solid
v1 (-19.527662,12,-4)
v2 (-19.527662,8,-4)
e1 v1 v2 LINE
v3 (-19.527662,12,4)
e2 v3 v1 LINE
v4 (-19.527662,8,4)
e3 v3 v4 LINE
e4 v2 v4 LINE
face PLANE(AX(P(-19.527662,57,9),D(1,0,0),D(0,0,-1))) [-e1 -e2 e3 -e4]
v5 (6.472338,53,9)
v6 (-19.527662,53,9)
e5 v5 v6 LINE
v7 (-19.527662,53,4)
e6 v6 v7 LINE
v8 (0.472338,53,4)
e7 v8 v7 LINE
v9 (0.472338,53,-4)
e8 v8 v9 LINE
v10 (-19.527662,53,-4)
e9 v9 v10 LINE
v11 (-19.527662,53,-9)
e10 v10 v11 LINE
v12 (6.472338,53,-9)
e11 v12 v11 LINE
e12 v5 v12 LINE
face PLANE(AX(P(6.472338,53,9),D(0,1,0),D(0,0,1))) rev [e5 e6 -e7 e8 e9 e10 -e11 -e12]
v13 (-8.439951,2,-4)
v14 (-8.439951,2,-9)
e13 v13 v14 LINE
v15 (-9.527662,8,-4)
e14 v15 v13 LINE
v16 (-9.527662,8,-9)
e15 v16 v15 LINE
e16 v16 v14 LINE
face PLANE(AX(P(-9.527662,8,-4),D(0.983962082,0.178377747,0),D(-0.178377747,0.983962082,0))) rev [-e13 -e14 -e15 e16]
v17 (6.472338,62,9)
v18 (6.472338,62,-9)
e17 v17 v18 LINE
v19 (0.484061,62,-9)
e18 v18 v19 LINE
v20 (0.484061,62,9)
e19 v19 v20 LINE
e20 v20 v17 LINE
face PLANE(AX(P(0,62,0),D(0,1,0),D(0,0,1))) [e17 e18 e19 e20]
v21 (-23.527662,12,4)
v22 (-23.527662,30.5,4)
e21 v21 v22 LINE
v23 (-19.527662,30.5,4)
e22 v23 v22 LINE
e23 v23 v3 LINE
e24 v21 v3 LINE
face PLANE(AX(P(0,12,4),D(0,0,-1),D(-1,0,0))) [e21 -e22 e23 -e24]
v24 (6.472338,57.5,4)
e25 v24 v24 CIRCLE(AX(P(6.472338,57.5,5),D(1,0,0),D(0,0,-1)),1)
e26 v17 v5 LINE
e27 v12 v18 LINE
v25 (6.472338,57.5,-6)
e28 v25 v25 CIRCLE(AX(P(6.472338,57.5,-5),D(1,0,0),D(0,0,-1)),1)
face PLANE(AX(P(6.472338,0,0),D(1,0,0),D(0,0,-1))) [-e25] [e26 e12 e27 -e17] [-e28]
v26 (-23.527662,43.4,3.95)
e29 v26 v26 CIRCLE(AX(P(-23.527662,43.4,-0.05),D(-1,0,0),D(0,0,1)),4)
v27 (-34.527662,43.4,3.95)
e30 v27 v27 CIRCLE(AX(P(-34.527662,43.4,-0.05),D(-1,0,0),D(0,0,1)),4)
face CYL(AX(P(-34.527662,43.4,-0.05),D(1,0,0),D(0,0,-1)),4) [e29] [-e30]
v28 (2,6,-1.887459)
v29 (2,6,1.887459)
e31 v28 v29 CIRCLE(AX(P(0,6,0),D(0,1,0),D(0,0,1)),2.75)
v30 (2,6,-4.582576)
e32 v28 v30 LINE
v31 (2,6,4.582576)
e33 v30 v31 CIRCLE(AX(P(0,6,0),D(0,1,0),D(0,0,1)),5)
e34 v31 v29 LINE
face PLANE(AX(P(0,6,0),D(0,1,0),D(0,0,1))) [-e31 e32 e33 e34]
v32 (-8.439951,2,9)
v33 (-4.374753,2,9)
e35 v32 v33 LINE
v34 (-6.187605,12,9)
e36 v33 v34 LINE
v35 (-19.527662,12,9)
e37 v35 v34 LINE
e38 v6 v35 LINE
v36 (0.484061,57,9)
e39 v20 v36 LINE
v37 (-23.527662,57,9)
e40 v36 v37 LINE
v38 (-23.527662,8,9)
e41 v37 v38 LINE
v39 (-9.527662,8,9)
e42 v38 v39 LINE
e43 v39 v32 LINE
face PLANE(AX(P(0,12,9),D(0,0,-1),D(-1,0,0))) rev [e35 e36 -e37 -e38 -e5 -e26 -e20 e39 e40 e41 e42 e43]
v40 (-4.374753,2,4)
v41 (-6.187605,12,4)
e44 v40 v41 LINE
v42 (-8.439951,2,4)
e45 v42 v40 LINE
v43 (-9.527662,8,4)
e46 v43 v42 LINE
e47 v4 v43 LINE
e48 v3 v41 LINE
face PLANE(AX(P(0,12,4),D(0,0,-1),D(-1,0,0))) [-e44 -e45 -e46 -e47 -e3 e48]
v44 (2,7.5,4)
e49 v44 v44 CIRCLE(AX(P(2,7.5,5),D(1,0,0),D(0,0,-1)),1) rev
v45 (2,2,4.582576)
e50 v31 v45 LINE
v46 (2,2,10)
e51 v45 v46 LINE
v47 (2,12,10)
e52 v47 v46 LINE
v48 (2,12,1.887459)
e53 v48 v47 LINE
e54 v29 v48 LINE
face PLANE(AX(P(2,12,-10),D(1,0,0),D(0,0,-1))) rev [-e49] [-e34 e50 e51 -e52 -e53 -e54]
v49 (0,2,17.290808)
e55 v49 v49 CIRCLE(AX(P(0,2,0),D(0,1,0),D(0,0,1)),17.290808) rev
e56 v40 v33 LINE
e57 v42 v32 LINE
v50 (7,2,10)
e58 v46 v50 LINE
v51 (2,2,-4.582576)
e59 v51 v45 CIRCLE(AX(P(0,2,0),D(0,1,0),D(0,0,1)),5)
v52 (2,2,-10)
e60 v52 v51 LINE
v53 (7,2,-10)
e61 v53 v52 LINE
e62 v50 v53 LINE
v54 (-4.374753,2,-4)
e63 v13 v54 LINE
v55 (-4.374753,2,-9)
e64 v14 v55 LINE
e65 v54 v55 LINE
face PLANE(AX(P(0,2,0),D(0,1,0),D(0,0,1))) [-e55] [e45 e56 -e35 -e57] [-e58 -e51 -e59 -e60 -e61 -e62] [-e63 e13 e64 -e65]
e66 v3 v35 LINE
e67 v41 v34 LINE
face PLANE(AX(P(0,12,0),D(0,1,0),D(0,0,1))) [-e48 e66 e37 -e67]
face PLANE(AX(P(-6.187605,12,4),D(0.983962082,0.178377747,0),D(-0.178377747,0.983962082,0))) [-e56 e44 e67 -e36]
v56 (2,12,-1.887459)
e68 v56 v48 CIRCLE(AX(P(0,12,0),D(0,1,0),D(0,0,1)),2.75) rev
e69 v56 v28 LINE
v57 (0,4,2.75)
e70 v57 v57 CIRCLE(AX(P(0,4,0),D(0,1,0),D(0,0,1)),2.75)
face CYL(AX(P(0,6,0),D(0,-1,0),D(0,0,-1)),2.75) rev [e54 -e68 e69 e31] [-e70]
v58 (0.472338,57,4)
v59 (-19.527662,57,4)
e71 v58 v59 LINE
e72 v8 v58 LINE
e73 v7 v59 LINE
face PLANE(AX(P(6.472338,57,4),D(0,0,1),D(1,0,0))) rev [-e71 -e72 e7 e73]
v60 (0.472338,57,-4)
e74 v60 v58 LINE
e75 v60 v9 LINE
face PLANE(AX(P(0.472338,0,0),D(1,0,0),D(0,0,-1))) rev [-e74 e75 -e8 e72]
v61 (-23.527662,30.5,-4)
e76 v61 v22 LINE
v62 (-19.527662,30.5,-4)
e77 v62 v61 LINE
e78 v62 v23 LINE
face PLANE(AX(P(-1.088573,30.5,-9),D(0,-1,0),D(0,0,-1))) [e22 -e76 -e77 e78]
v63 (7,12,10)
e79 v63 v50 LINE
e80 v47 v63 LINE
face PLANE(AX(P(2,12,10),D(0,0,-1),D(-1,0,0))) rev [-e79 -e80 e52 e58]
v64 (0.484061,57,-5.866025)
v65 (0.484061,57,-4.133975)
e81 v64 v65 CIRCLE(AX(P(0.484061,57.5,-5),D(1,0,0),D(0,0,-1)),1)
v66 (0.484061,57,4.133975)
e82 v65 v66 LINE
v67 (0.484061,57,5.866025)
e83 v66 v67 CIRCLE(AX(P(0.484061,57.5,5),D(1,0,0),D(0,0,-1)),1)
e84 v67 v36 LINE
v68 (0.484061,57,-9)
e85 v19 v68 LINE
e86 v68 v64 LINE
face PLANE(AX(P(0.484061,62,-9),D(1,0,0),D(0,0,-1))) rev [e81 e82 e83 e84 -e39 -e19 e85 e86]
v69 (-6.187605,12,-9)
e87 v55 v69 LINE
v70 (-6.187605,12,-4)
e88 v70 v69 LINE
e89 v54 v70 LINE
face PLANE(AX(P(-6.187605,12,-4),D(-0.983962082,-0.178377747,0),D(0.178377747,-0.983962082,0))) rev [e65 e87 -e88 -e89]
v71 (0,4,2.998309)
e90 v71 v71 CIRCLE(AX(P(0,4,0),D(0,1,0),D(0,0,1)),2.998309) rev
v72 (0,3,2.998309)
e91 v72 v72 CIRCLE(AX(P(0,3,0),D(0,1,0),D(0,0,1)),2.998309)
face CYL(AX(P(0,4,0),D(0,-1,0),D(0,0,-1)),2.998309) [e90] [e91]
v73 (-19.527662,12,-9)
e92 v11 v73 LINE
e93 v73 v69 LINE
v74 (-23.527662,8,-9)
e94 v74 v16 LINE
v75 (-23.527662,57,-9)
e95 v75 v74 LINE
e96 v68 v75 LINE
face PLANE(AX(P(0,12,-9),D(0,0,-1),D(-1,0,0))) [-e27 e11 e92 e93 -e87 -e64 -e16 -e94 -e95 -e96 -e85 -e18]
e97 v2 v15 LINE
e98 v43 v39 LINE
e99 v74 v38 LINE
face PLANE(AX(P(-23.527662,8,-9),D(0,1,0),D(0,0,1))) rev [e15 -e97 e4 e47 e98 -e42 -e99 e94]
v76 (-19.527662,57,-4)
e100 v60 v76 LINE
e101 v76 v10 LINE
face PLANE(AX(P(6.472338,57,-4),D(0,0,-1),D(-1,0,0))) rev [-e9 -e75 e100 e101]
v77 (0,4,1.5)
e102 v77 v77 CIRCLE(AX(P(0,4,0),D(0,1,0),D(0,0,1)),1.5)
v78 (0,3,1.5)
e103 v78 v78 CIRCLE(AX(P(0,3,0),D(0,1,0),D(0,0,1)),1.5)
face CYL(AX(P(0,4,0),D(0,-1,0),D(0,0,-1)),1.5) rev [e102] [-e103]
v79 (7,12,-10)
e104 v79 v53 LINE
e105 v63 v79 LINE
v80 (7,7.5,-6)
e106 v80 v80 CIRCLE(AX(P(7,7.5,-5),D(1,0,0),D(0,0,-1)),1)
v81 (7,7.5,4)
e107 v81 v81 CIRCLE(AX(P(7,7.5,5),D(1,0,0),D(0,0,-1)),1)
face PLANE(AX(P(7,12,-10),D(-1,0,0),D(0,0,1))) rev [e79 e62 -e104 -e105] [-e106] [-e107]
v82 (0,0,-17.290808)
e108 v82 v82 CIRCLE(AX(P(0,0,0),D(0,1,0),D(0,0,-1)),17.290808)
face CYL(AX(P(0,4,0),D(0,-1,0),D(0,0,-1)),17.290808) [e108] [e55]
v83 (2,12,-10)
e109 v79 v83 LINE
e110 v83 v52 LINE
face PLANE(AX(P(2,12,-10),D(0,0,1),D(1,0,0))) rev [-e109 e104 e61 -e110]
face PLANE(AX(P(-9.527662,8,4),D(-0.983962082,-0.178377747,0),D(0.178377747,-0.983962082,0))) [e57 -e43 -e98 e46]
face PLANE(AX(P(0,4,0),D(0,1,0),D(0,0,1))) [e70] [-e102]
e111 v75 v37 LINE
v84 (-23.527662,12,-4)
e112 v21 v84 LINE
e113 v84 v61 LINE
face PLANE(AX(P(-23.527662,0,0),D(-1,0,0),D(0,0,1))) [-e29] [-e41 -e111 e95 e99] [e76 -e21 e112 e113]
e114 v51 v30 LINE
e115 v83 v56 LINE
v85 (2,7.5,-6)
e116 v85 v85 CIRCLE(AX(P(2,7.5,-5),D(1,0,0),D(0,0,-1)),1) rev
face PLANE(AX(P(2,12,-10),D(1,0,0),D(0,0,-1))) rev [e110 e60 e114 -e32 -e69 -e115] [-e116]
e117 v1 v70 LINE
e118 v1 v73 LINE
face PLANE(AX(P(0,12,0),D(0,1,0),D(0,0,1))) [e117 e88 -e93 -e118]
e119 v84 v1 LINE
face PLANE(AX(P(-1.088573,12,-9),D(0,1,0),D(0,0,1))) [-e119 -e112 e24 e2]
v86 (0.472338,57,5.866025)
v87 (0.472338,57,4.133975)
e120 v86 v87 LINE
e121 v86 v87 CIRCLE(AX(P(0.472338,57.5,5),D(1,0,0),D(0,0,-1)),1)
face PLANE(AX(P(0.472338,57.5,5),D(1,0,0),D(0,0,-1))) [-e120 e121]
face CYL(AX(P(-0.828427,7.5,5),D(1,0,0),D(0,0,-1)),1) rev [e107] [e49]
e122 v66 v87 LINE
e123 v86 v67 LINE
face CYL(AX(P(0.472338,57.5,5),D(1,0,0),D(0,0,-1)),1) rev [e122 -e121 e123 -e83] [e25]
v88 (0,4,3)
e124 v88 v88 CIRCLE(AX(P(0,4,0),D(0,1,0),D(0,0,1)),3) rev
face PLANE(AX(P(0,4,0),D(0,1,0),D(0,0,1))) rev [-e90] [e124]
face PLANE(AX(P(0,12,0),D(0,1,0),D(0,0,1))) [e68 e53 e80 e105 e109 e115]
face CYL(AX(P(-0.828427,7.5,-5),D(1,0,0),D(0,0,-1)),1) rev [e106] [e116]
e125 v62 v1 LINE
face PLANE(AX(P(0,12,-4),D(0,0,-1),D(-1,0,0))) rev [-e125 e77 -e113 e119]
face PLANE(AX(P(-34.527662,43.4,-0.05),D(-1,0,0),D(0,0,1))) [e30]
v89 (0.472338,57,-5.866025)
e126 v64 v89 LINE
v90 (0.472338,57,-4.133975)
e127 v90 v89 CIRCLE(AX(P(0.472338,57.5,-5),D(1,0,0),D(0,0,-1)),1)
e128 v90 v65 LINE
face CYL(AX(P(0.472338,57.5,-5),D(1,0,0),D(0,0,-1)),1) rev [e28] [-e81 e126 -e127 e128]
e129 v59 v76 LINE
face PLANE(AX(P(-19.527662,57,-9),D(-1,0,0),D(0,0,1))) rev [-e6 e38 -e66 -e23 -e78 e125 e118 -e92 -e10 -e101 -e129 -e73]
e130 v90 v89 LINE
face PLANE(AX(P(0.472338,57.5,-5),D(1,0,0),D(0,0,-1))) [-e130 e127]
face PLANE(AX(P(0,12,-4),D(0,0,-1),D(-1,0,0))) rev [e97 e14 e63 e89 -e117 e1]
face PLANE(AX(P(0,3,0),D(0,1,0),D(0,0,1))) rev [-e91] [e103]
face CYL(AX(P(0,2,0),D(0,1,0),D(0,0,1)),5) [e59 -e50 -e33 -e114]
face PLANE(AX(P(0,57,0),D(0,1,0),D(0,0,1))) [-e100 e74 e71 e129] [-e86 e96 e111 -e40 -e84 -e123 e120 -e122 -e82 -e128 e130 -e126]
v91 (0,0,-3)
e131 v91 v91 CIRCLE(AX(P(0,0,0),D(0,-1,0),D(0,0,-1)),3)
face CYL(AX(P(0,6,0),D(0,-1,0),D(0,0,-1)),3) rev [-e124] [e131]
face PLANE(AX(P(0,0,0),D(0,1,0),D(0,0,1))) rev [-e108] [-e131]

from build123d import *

# Parameters (mm, degrees)
SKETCH1_W                  = 40
SKETCH1_H                  = 25
BOSS_EXTRUDE1_DEPTH        = 2
SKETCH2_W                  = 5
SKETCH2_H                  = 20
BOSS_EXTRUDE2_DEPTH        = 10
SKETCH4_W                  = 19.965035534
SKETCH4_H                  = 6
BOSS_EXTRUDE3_DEPTH        = 5
SKETCH5_R                  = 1
CUT_EXTRUDE2_DEPTH         = 5
SKETCH6_W                  = 4
SKETCH6_H                  = 5
BOSS_EXTRUDE4_DEPTH        = 10
SKETCH8_W                  = 5
SKETCH8_H                  = 4
BOSS_EXTRUDE5_DEPTH        = 10
SKETCH9_W                  = 4
SKETCH9_H                  = 5
BOSS_EXTRUDE6_DEPTH        = 45
SKETCH12_W                 = 18
SKETCH12_H                 = 4
BOSS_EXTRUDE8_DEPTH        = 4
SKETCH13_W                 = 5
SKETCH13_H                 = 4
BOSS_EXTRUDE9_DEPTH        = 26
SKETCH14_W                 = 18
SKETCH14_H                 = 4
BOSS_EXTRUDE10_DEPTH       = 6
SKETCH16_W                 = 5.988277512
SKETCH16_H                 = 18
BOSS_EXTRUDE11_DEPTH       = 5
SKETCH15_R                 = 1
CUT_EXTRUDE3_DEPTH         = 6
SKETCH17_R                 = 3
CUT_EXTRUDE5_DEPTH         = 6
SKETCH24_W                 = 8
SKETCH24_H                 = 18.5
BOSS_EXTRUDE18_DEPTH       = 4
BOSS_EXTRUDE20_START       = -1
SKETCH20_R                 = 5
SKETCH20_R_2               = 3
BOSS_EXTRUDE20_DEPTH       = 1
BOSS_EXTRUDE21_OUTLINE_R   = 2.998308623
BOSS_EXTRUDE21_OUTLINE_R_2 = 1.5
BOSS_EXTRUDE21_DEPTH       = 1
SKETCH27_R                 = 5
SKETCH27_R_2               = 2.75
BOSS_EXTRUDE22_DEPTH       = 2
SKETCH28_R                 = 2.75
CUT_EXTRUDE10_DEPTH        = 10
SKETCH31_R                 = 4
BOSS_EXTRUDE23_DEPTH       = 11
SKETCH32_R                 = 23.58495283
BOSS_EXTRUDE24_DEPTH       = 2
SKETCH33_R                 = 3
CUT_EXTRUDE11_DEPTH        = 3
CUT_EXTRUDE12_DEPTH        = 10
CUT_EXTRUDE13_DEPTH        = 4
BOSS_EXTRUDE25_DEPTH       = 2
CUT_EXTRUDE15_DEPTH        = 2
SKETCH38_W                 = 4
SKETCH38_H                 = 6
CUT_EXTRUDE16_DEPTH        = 76.679363321
BOSS_EXTRUDE26_DEPTH       = 5


# Read off the part's stored shape, not the designer's step: Boss-Extrude21
with BuildPart() as part:
    # Sketch1 → Boss-Extrude1 (new body)
    with BuildSketch(Plane(origin=(0, 0, 0), x_dir=(1, 0, 0), z_dir=(0, 1, 0))):
        Rectangle(SKETCH1_W, SKETCH1_H)
    extrude(amount=BOSS_EXTRUDE1_DEPTH)

    # Sketch2 → Boss-Extrude2 (add)
    with BuildSketch(Plane(origin=(0, 2, 0), x_dir=(1, 0, 0), z_dir=(0, 1, 0))):
        with Locations((4.5, 0)):
            Rectangle(SKETCH2_W, SKETCH2_H)
    extrude(amount=BOSS_EXTRUDE2_DEPTH)

    # Sketch4 → Boss-Extrude3 (add)
    with BuildSketch(Plane(origin=(7, 0, 0), x_dir=(0, 0, -1), z_dir=(1, 0, 0))):
        with Locations((-0.017482233, 9)):
            Rectangle(SKETCH4_W, SKETCH4_H)
    extrude(amount=-BOSS_EXTRUDE3_DEPTH)

    # Sketch5 → Cut-Extrude2 (cut)
    with BuildSketch(Plane(origin=(7, 0, 0), x_dir=(0, 0, -1), z_dir=(1, 0, 0))):
        with Locations((5, 7.5)):
            Circle(SKETCH5_R)
        with Locations((-5, 7.5)):
            Circle(SKETCH5_R)
    extrude(amount=-CUT_EXTRUDE2_DEPTH, mode=Mode.SUBTRACT)

    # Sketch6 → Boss-Extrude4 (add)
    with BuildSketch(Plane(origin=(0, 2, 0), x_dir=(1, 0, 0), z_dir=(0, 1, 0))):
        with Locations((-11.527661753, -6.5)):
            Rectangle(SKETCH6_W, SKETCH6_H)
        with Locations((-11.527661753, 6.5)):
            Rectangle(SKETCH6_W, SKETCH6_H)
    extrude(amount=BOSS_EXTRUDE4_DEPTH)

    # Sketch8 → Boss-Extrude5 (add)
    with BuildSketch(Plane.ZY.offset(13.527661753)):
        with Locations((-6.5, 10)):
            Rectangle(SKETCH8_W, SKETCH8_H)
    boss_extrude5 = extrude(amount=BOSS_EXTRUDE5_DEPTH)

    # Mirror1: Boss-Extrude5 across plane
    add(boss_extrude5.mirror(Plane(origin=(0, 0, 0), x_dir=(1, 0, 0), z_dir=(0, 0, -1))))

    # Sketch9 → Boss-Extrude6 (add)
    with BuildSketch(Plane(origin=(0, 12, 0), x_dir=(1, 0, 0), z_dir=(0, 1, 0))):
        with Locations((-21.527661753, 6.5)):
            Rectangle(SKETCH9_W, SKETCH9_H)
    boss_extrude6 = extrude(amount=BOSS_EXTRUDE6_DEPTH)

    # Mirror2: Boss-Extrude5 across plane
    add(boss_extrude5.mirror(Plane(origin=(0, 0, 0), x_dir=(1, 0, 0), z_dir=(0, 0, -1))))

    # Mirror3: Boss-Extrude6 across plane
    add(boss_extrude6.mirror(Plane(origin=(0, 0, 0), x_dir=(1, 0, 0), z_dir=(0, 0, -1))))

    # Sketch12 → Boss-Extrude8 (add)
    with BuildSketch(Plane.ZY.offset(23.527661753)):
        with Locations((0, 55)):
            Rectangle(SKETCH12_W, SKETCH12_H)
        with Locations((0, 10)):
            Rectangle(SKETCH12_W, SKETCH12_H)
        with Locations((0, 32.5)):
            Rectangle(SKETCH12_W, SKETCH12_H)
    extrude(amount=-BOSS_EXTRUDE8_DEPTH)

    # Sketch13 → Boss-Extrude9 (add)
    with BuildSketch(Plane(origin=(-19.527661753, 0, 0), x_dir=(0, 0, -1), z_dir=(1, 0, 0))):
        with Locations((-6.5, 55)):
            Rectangle(SKETCH13_W, SKETCH13_H)
        with Locations((6.5, 55)):
            Rectangle(SKETCH13_W, SKETCH13_H)
    extrude(amount=BOSS_EXTRUDE9_DEPTH)

    # Sketch14 → Boss-Extrude10 (add)
    with BuildSketch(Plane(origin=(6.472338247, 0, 0), x_dir=(0, 0, -1), z_dir=(1, 0, 0))):
        with Locations((0, 55)):
            Rectangle(SKETCH14_W, SKETCH14_H)
    extrude(amount=-BOSS_EXTRUDE10_DEPTH)

    # Sketch16 → Boss-Extrude11 (add)
    with BuildSketch(Plane(origin=(0, 57, 0), x_dir=(1, 0, 0), z_dir=(0, 1, 0))):
        with Locations((3.478199491, 0)):
            Rectangle(SKETCH16_W, SKETCH16_H)
    extrude(amount=BOSS_EXTRUDE11_DEPTH)

    # Sketch15 → Cut-Extrude3 (cut)
    with BuildSketch(Plane(origin=(6.472338247, 0, 0), x_dir=(0, 0, -1), z_dir=(1, 0, 0))):
        with Locations((-5, 57.5)):
            Circle(SKETCH15_R)
        with Locations((5, 57.5)):
            Circle(SKETCH15_R)
    extrude(amount=-CUT_EXTRUDE3_DEPTH, mode=Mode.SUBTRACT)

    # Sketch17 → Cut-Extrude5 (cut)
    with BuildSketch(Plane.XZ):
        with Locations(Location((0, 0, 0), (0, 0, 270))):
            Circle(SKETCH17_R)
    extrude(amount=-CUT_EXTRUDE5_DEPTH, mode=Mode.SUBTRACT)

    # Sketch24 → Boss-Extrude18 (add)
    with BuildSketch(Plane.ZY.offset(23.527661753)):
        with Locations((0, 43.75)):
            Rectangle(SKETCH24_W, SKETCH24_H)
    extrude(amount=-BOSS_EXTRUDE18_DEPTH)

    # Sketch20 → Boss-Extrude20 (add)
    with BuildSketch(Plane(origin=(0, 3, 0), x_dir=(1, 0, 0), z_dir=(0, 1, 0)).offset(BOSS_EXTRUDE20_START)):
        Circle(SKETCH20_R)
        with Locations(Location((0, 0, 0), (0, 0, 90))):
            Circle(SKETCH20_R_2, mode=Mode.SUBTRACT)
    extrude(amount=BOSS_EXTRUDE20_DEPTH)

    # Boss-Extrude21 outline → Boss-Extrude21 (add)
    # profile 1 of 2: a face of its own
    with BuildSketch(Plane(origin=(0, 3, 0), x_dir=(1, 0, 0), z_dir=(0, 1, 0))):
        with BuildLine():
            ThreePointArc((2, -2.236067977), (-3, 0), (2, 2.236067977))
            Line((2, 2.236067977), (2, 4.582575695))
            ThreePointArc((2, 4.582575695), (-5, 0), (2, -4.582575695))
            Line((2, -4.582575695), (2, -2.236067977))
        make_face()
    # profile 2 of 2: a face of its own
    with BuildSketch(Plane(origin=(0, 3, 0), x_dir=(1, 0, 0), z_dir=(0, 1, 0))):
        Circle(BOSS_EXTRUDE21_OUTLINE_R)
        Circle(BOSS_EXTRUDE21_OUTLINE_R_2, mode=Mode.SUBTRACT)
    extrude(amount=BOSS_EXTRUDE21_DEPTH)

    # Sketch27 → Boss-Extrude22 (add)
    with BuildSketch(Plane(origin=(0, 4, 0), x_dir=(1, 0, 0), z_dir=(0, 1, 0))):
        Circle(SKETCH27_R)
        with Locations(Location((0, 0, 0), (0, 0, 43.341758227))):
            Circle(SKETCH27_R_2, mode=Mode.SUBTRACT)
    extrude(amount=BOSS_EXTRUDE22_DEPTH)

    # Sketch28 → Cut-Extrude10 (cut)
    with BuildSketch(Plane(origin=(0, 6, 0), x_dir=(1, 0, 0), z_dir=(0, 1, 0))):
        with Locations(Location((0, 0, 0), (0, 0, 43.341758227))):
            Circle(SKETCH28_R)
    extrude(amount=CUT_EXTRUDE10_DEPTH, mode=Mode.SUBTRACT)

    # Sketch31 → Boss-Extrude23 (add)
    with BuildSketch(Plane.ZY.offset(23.527661753)):
        with Locations((-0.05, 43.4)):
            Circle(SKETCH31_R)
    extrude(amount=BOSS_EXTRUDE23_DEPTH)

    # Sketch32 → Boss-Extrude24 (add)
    with BuildSketch(Plane.XZ):
        with Locations(Location((0, 0, 0), (0, 0, 270))):
            Circle(SKETCH32_R)
    extrude(amount=-BOSS_EXTRUDE24_DEPTH)

    # Sketch33 → Cut-Extrude11 (cut)
    with BuildSketch(Plane.XZ):
        with Locations(Location((0, 0, 0), (0, 0, 270))):
            Circle(SKETCH33_R)
    extrude(amount=-CUT_EXTRUDE11_DEPTH, mode=Mode.SUBTRACT)

    # Sketch34 → Cut-Extrude12 (cut)
    with BuildSketch(Plane(origin=(0, 2, 0), x_dir=(1, 0, 0), z_dir=(0, 1, 0))):
        with BuildLine():
            Line((-10.212765957, 21.718642027), (-10.212765957, 13.952471709))
            Line((-10.212765957, 13.952471709), (10.212765957, 13.952471709))
            Line((10.212765957, 13.952471709), (10.212765957, 21.718642027))
            ThreePointArc((10.212765957, 21.718642027), (0, 24), (-10.212765957, 21.718642027))
        make_face()
    extrude(amount=-CUT_EXTRUDE12_DEPTH, mode=Mode.SUBTRACT)

    # Sketch35 → Cut-Extrude13 (cut)
    with BuildSketch(Plane.XZ):
        with BuildLine():
            Line((-17.290808405, 0), (-23.58495283, 0))
            ThreePointArc((-23.58495283, 0), (-19.96393753, -12.557515611), (-10.212765957, -21.259101851))
            Line((-10.212765957, -21.259101851), (-10.212765957, -13.952471709))
            ThreePointArc((-10.212765957, -13.952471709), (-15.420101082, -7.822565942), (-17.290808405, 0))
        make_face()
    extrude(amount=-CUT_EXTRUDE13_DEPTH, mode=Mode.SUBTRACT)

    # Sketch36 → Boss-Extrude25 (add)
    with BuildSketch(Plane.XZ):
        with BuildLine():
            Line((-10.212765957, -13.952471709), (10.212765957, -13.952471709))
            ThreePointArc((10.212765957, -13.952471709), (0, -17.290808405), (-10.212765957, -13.952471709))
        make_face()
    extrude(amount=-BOSS_EXTRUDE25_DEPTH)

    # Sketch37 → Cut-Extrude15 (cut)
    with BuildSketch(Plane.XZ):
        with BuildLine():
            Line((-23.58495283, 0), (-17.290808405, 0))
            ThreePointArc((-17.290808405, 0), (7.822565942, 15.420101082), (10.212765957, -13.952471709))
            Line((10.212765957, -13.952471709), (10.212765957, -21.259101851))
            ThreePointArc((10.212765957, -21.259101851), (12.557515611, 19.96393753), (-23.58495283, 0))
        make_face()
    extrude(amount=-CUT_EXTRUDE15_DEPTH, mode=Mode.SUBTRACT)

    # Sketch38 → Cut-Extrude16 (cut, through all)
    with BuildSketch(Plane.XY.offset(9)):
        with Locations((-11.527661753, 5)):
            Rectangle(SKETCH38_W, SKETCH38_H)
    extrude(amount=-CUT_EXTRUDE16_DEPTH, mode=Mode.SUBTRACT)


with BuildPart() as cut_extrude16_piece_1:
    # of the separate pieces the step leaves, piece 1, a body of its own (cut_extrude16_pieces)
    add(part.part.solids().sort_by_distance((-9.527661753, 8, -4))[0])



with BuildPart() as cut_extrude16_piece_2:
    # of the separate pieces the step leaves, piece 2, a body of its own (cut_extrude16_pieces)
    add(part.part.solids().sort_by_distance((-17.290808405, 0, 0))[0])


with BuildPart() as cut_extrude16_piece_1_1:
    add(cut_extrude16_piece_1.part)

    add(cut_extrude16_piece_2.part)  # Boss-Extrude26 merges Cut-Extrude16 piece 2
    # Sketch39 → Boss-Extrude26 (add)
    with BuildSketch(Plane.XY.offset(9)):
        Polygon((-9.527661753, 8), (-8.439950649, 2), (-4.374753349, 2), (-6.187605188, 12), (-9.527661753, 12), align=None)
    boss_extrude26 = extrude(amount=-BOSS_EXTRUDE26_DEPTH)

    # Mirror4: Boss-Extrude26 across plane
    add(boss_extrude26.mirror(Plane(origin=(0, 0, 0), x_dir=(1, 0, 0), z_dir=(0, 0, -1))))


solid = cut_extrude16_piece_1_1.part
